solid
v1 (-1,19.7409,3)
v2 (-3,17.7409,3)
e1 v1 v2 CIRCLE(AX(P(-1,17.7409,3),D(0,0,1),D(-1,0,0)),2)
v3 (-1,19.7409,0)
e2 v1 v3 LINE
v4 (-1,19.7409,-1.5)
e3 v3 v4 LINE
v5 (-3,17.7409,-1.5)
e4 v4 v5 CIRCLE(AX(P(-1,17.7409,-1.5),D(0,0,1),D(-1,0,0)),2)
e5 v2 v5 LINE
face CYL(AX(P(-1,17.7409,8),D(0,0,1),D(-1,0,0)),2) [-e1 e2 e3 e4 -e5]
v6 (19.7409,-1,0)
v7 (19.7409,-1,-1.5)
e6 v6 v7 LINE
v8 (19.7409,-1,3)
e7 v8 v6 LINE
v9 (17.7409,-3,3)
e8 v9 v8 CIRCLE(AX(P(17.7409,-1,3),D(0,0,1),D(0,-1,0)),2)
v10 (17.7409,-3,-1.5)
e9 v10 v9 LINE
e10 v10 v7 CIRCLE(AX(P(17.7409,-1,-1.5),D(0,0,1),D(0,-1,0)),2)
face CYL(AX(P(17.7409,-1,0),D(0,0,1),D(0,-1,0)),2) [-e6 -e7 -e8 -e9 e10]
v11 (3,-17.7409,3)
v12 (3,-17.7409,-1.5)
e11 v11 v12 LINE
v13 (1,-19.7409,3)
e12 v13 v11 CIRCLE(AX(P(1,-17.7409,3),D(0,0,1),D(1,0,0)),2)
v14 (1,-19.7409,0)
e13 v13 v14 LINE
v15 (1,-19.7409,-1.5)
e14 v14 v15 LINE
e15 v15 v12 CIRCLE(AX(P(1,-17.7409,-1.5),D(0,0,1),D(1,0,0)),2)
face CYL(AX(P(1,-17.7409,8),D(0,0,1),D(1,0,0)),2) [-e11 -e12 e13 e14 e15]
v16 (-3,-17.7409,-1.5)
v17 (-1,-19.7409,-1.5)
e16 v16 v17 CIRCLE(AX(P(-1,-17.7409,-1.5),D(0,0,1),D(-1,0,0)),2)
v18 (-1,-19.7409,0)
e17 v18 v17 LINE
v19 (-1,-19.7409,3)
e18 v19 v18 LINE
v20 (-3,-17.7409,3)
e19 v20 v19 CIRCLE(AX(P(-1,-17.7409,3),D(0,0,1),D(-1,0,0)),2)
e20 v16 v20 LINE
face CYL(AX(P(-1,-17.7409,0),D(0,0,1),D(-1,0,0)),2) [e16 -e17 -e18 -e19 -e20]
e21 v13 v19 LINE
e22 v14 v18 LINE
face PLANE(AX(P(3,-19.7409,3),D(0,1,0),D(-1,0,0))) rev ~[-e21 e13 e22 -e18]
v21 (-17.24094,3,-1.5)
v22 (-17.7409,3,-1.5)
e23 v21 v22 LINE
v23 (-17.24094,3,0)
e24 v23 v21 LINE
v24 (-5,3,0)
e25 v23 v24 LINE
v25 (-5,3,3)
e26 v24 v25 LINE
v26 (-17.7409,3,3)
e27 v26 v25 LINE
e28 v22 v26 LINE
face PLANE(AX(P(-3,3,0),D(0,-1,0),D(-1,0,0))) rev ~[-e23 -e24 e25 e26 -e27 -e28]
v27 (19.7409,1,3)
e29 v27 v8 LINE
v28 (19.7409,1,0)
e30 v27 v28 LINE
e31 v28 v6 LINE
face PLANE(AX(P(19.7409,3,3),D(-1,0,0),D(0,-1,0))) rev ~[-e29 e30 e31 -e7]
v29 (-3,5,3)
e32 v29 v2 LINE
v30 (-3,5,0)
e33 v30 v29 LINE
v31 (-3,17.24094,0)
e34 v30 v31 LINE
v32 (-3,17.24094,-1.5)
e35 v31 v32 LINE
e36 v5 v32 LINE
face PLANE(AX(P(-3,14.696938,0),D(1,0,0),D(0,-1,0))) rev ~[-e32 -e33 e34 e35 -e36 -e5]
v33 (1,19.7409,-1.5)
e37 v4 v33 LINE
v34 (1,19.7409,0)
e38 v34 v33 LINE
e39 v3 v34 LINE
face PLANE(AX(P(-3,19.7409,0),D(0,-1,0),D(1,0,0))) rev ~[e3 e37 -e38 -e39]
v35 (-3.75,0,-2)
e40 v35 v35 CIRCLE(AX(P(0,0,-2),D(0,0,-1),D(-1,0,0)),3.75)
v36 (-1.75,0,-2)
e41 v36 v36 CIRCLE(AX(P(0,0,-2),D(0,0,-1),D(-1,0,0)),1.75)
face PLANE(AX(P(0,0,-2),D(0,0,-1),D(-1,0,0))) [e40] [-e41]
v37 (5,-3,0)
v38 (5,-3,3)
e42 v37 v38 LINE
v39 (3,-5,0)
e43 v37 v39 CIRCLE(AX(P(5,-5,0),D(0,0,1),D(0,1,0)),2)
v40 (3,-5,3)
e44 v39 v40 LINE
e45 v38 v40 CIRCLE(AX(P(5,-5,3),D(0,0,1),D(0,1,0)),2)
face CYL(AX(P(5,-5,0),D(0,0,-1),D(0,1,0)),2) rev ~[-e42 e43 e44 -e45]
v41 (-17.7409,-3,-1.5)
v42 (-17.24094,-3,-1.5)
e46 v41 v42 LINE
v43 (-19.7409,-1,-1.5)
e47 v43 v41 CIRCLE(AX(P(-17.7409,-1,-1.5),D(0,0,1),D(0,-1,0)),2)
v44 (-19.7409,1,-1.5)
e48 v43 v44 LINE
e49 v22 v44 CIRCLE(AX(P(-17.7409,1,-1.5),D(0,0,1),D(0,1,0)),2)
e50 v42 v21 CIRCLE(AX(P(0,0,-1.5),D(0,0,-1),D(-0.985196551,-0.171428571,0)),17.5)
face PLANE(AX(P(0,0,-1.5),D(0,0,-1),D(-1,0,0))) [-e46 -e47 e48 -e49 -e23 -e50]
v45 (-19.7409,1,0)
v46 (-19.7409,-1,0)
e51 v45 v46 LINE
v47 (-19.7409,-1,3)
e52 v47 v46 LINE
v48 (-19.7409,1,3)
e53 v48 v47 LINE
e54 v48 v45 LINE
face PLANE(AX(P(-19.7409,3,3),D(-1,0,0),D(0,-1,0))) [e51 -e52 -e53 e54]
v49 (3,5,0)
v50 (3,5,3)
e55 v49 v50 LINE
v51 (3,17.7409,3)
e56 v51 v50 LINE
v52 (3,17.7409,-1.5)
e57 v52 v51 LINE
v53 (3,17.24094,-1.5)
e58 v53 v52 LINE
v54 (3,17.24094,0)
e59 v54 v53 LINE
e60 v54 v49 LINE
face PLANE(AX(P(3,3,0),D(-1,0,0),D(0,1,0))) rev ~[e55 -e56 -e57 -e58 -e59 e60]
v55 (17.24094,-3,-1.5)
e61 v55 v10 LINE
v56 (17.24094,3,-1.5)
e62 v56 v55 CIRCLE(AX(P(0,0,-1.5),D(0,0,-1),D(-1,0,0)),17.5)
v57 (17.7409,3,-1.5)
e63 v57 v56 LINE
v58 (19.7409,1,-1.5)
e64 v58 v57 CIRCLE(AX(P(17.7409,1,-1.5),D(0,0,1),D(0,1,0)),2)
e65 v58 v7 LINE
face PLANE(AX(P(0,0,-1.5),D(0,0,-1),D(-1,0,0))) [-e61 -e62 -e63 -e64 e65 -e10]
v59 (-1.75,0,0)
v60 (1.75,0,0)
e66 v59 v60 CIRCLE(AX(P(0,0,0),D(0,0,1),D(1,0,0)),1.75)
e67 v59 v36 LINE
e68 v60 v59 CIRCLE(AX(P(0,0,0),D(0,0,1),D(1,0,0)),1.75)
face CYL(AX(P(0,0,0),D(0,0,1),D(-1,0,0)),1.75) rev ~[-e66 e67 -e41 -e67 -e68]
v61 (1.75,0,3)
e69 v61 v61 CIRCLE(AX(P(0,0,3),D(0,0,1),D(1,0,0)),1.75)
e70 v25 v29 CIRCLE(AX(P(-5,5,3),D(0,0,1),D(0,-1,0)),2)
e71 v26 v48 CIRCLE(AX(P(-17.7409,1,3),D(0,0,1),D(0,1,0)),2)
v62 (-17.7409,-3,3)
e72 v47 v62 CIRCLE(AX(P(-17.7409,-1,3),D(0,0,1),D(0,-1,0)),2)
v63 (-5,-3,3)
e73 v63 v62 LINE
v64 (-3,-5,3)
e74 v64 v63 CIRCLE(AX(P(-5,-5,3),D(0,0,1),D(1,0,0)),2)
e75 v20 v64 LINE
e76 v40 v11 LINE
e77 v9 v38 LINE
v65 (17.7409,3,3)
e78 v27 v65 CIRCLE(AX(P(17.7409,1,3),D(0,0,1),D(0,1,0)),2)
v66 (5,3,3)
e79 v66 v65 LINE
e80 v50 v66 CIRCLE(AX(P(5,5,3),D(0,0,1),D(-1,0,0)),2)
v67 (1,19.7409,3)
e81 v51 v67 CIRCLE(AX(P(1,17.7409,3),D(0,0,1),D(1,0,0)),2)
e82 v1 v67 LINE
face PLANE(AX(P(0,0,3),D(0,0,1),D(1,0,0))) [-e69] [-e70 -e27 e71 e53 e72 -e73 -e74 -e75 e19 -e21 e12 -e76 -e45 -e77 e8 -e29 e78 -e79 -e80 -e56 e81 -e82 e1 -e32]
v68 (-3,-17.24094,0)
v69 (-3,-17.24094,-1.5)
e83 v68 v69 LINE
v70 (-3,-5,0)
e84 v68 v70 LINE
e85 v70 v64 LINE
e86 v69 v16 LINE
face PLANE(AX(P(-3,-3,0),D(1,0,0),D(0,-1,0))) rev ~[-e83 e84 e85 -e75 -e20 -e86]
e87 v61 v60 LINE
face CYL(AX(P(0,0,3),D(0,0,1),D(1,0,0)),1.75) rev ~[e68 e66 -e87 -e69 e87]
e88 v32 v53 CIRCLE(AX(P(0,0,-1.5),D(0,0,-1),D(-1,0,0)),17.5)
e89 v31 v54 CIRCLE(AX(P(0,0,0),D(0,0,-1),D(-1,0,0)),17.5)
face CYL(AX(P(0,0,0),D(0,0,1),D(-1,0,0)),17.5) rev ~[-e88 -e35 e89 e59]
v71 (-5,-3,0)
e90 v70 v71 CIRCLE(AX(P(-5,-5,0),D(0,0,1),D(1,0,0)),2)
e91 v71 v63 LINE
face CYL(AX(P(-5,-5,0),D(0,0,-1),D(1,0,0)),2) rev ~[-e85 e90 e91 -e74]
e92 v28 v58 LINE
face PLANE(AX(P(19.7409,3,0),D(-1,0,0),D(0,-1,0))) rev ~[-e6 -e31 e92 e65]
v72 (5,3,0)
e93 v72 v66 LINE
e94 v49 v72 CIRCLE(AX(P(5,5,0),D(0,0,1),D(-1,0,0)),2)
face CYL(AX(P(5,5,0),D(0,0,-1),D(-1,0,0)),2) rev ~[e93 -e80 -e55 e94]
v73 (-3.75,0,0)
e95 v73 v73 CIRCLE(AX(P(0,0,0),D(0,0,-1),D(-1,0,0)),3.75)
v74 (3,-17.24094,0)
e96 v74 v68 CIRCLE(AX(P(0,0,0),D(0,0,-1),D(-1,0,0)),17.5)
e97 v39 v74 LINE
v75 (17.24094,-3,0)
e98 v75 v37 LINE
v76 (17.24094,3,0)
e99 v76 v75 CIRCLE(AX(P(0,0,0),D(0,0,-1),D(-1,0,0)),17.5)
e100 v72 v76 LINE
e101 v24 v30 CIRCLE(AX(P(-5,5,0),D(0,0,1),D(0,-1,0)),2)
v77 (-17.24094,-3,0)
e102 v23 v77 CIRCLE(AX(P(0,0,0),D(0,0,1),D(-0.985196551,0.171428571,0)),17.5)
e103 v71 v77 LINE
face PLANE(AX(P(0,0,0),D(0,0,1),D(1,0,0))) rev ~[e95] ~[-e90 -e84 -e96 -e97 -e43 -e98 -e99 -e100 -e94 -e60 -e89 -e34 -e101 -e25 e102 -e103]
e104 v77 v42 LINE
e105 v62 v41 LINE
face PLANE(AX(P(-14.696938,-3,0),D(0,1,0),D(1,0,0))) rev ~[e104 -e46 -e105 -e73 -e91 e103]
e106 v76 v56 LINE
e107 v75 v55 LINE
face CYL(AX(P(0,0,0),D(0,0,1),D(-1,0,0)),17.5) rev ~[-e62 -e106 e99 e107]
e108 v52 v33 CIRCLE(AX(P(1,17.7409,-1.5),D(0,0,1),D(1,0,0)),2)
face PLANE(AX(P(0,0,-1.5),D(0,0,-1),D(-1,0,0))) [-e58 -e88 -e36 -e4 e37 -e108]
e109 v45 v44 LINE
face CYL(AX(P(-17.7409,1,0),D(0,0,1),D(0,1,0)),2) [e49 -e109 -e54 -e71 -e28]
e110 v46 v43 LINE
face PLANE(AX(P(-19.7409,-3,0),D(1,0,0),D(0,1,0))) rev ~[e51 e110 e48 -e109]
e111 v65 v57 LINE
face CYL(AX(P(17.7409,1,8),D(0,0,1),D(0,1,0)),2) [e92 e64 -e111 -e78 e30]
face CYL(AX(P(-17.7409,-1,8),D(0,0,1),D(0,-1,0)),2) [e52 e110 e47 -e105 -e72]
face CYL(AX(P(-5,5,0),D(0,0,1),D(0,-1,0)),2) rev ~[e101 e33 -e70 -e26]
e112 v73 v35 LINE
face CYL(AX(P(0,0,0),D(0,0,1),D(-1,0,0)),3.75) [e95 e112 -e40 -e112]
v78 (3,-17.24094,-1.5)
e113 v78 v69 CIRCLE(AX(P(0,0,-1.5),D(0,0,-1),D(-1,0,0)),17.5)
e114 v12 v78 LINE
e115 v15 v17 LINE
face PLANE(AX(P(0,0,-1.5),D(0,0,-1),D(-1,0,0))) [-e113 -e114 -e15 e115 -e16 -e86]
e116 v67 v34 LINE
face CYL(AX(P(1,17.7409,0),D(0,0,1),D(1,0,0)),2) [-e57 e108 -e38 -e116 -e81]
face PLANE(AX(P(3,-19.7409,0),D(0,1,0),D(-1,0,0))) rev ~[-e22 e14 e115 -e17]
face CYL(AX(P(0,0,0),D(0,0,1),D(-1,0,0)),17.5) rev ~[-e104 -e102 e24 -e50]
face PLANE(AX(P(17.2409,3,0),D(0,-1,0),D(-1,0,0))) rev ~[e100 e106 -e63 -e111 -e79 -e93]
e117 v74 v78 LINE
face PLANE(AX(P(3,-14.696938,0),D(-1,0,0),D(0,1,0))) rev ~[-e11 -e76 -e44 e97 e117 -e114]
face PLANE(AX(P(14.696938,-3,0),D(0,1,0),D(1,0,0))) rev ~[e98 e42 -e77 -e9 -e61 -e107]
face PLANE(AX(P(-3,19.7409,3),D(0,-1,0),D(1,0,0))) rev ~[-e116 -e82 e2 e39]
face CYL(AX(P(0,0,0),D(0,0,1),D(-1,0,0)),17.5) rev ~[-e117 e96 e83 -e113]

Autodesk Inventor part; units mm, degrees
ref_plane "YZ Plane" through (0, 0, 0) normal (1, 0, 0) x (0, 1, 0)
ref_plane "XZ Plane" through (0, 0, 0) normal (0, 1, 0) x (-1, 0, 0)
sketch "Szkic1" plane through (0, 0, 0) normal (0, 0, 1) x (1, 0, 0)
  circle A0 centre (0, 0) radius 17.5
  circle A1 centre (0, 0) radius 15
  line L0 (-3, -17.2409) -> (3, -17.2409)
  line L1 (3, -17.2409) -> (3, 17.2409)
  line L2 (3, 17.2409) -> (-3, 17.2409)
  line L3 (-3, 17.2409) -> (-3, -17.2409)
  line L4 (-3, -17.2409) -> (3, 17.2409) construction
  line L5 (3, -17.2409) -> (-3, 17.2409) construction
  line L6 (17.2409, 3) -> (-17.2409, 3)
  line L7 (-17.2409, 3) -> (-17.2409, -3)
  line L8 (-17.2409, -3) -> (17.2409, -3)
  line L9 (17.2409, -3) -> (17.2409, 3)
  line L10 (17.2409, 3) -> (-17.2409, -3) construction
  line L11 (-17.2409, 3) -> (17.2409, -3) construction
  circle A2 centre (0, 0) radius 1.75
  point P0 (-3, 3)
  point P1 (-3, -3)
  point P2 (3, -3)
  point P3 (3, 3)
  dimension "d0" = 6
  dimension "d1" = 6
  dimension "d2" = 3.5
extrude "Wyciągnięcie proste1" add sketch "Szkic1" along normal blind 3 contours L9 L8 A1 L6 | L1 A1 L3 L2 | A1 L8 L1 L6 | L0 L3 A1 L1 | L1 L6 L3 A1 | L1 L8 L3 L6 | A1 L3 L8 L1 | L6 A1 L8 L7 | L3 L8 A1 L6 | A2
sketch "Szkic2" plane through (0, 0, 3) normal (0, 0, 1) x (1, 0, 0)
  circle A0 centre (0, 0) radius 1.75
  dimension "d5" = 3.5
extrude "Wyciągnięcie proste2" cut sketch "Szkic2" against normal through all
sketch "Szkic3" plane through (0, 0, 0) normal (0, 0, -1) x (-1, 0, 0)
  circle A0 centre (0, 0) radius 1.75
  circle A1 centre (0, 0) radius 3.75
  dimension "d8" = 2
ref_plane "Płaszczyzna konstrukcyjna1" through (-11.5, -11.5, -2) normal (0, 0, -1) x (0, 1, 0)
extrude "Wyciągnięcie proste3" add sketch "Szkic3" along normal up to surface (2 mm away)
sketch "Szkic4" plane through (0, 0, 3) normal (0, 0, 1) x (1, 0, 0)
  circle A0 centre (0, 0) radius 17.5
  circle A1 centre (0, 0) radius 1.75
  line L0 (-17.2409, 3) -> (-17.2409, -3)
  line L1 (-17.2409, -3) -> (-3, -3)
  line L2 (-3, -3) -> (-3, -17.2409)
  line L3 (-3, -17.2409) -> (3, -17.2409)
  line L4 (3, -17.2409) -> (3, -3)
  line L5 (3, -3) -> (17.2409, -3)
  line L6 (17.2409, -3) -> (17.2409, 3)
  line L7 (17.2409, 3) -> (3, 3)
  line L8 (3, 3) -> (3, 17.2409)
  line L9 (3, 17.2409) -> (-3, 17.2409)
  line L10 (-3, 17.2409) -> (-3, 3)
  line L11 (-3, 3) -> (-17.2409, 3)
  line L12 (17.2409, 3) -> (3, 3)
  line L13 (17.2409, 3) -> (19.7409, 3)
  line L14 (19.7409, 3) -> (19.7409, -3)
  line L15 (19.7409, -3) -> (17.2409, -3)
  line L16 (17.2409, -3) -> (17.2409, 3)
  line L17 (-3, 3) -> (-17.2409, 3)
  line L18 (-17.2409, 3) -> (-19.7409, 3)
  line L19 (-19.7409, 3) -> (-19.7409, -3)
  line L20 (-19.7409, -3) -> (-17.2409, -3)
  line L21 (-17.2409, -3) -> (-17.2409, 3)
  line L22 (-3, -17.2409) -> (3, -17.2409)
  line L23 (3, -17.2409) -> (3, -19.7409)
  line L24 (3, -19.7409) -> (-3, -19.7409)
  line L25 (-3, -19.7409) -> (-3, -17.2409)
  line L26 (3, 17.2409) -> (-3, 17.2409)
  line L27 (-3, 17.2409) -> (-3, 19.7409)
  line L28 (-3, 19.7409) -> (3, 19.7409)
  line L29 (3, 19.7409) -> (3, 17.2409)
  dimension "d11" = 2.5
  dimension "d12" = 2.5
  dimension "d13" = 2.5
  dimension "d14" = 2.5
extrude "Wyciągnięcie proste4" add sketch "Szkic4" against normal blind 3 contours A0 L6 | A0 L13 L14 L15 | L9 A0 | A0 L27 L28 L29 | L23 L24 L25 A0 | A0 L3 | L0 A0 | A0 L20 L19 L18
sketch "Szkic5" plane through (0, 0, 0) normal (0, 0, -1) x (-1, 0, 0)
  circle A0 centre (0, 0) radius 17.5
  circle A1 centre (0, 0) radius 3.75
  line L0 (3, 3) -> (19.7409, 3)
  line L1 (3, 3) -> (3, 19.7409)
  line L2 (3, 19.7409) -> (-3, 19.7409)
  line L3 (-3, 3) -> (-3, 19.7409)
  line L4 (-3, 3) -> (-19.7409, 3)
  line L5 (-19.7409, 3) -> (-19.7409, -3)
  line L6 (-3, -3) -> (-19.7409, -3)
  line L7 (-3, -3) -> (-3, -19.7409)
  line L8 (-3, -19.7409) -> (3, -19.7409)
  line L9 (3, -3) -> (3, -19.7409)
  line L10 (3, -3) -> (19.7409, -3)
  line L11 (19.7409, -3) -> (19.7409, 3)
  circle A2 centre (0, 0) radius 17.7
  point P0 (3, -17.4439)
  point P1 (-3, -17.4439)
  point P2 (17.4439, 3)
  point P3 (17.4439, -3)
  point P4 (-17.4439, -3)
  point P5 (-17.4439, 3)
  point P6 (-3, 17.4439)
  point P7 (3, 17.4439)
  dimension "d17" = 0.2
extrude "Wyciągnięcie proste5" add sketch "Szkic5" along normal blind 1.5 contours L0 L11 L10 A2 | A2 L3 L2 L1 | L9 L8 L7 A2 | A2 L6 L5 L4
fillet "Zaokrąglenie1" radius 2 19 edges at (-3, -3, 1.5) (-3, -19.7409, 1.5) (-3, -19.7409, -0.75) (-19.7409, -3, -0.75) (-19.7409, -3, 1.5) (3, -19.7409, -0.75) (3, -19.7409, 1.5) (3, -3, 1.5) (19.7409, -3, 1.5) (19.7409, -3, -0.75) (19.7409, 3, -0.75) (19.7409, 3, 1.5) (3, 3, 1.5) (3, 19.7409, 1.5) (3, 19.7409, -0.75) (-3, 19.7409, -0.75) (-3, 19.7409, 1.5) (-19.7409, 3, 1.5) (-19.7409, 3, -0.75)
fillet "Zaokrąglenie2" radius 2 1 edges at (-3, 3, 1.5)
sketch "Szkic6" plane through (0, 0, 0) normal (0, 0, -1) x (-1, 0, 0)
  circle A0 centre (0, 0) radius 17.5
  arc A1 (17.4439, -3) -> (17.4439, 3) centre (0, 0) ccw
  line L0 (5, 3) -> (17.4439, 3)
  arc A2 (3, 5) -> (5, 3) centre (5, 5) ccw
  line L1 (3, 5) -> (3, 17.4439)
  arc A3 (3, 17.4439) -> (-3, 17.4439) centre (0, 0) ccw
  line L2 (-3, 5) -> (-3, 17.4439)
  arc A4 (-5, 3) -> (-3, 5) centre (-5, 5) ccw
  line L3 (-5, 3) -> (-17.4439, 3)
  arc A5 (-17.4439, 3) -> (-17.4439, -3) centre (0, 0) ccw
  line L4 (-5, -3) -> (-17.4439, -3)
  arc A6 (-3, -5) -> (-5, -3) centre (-5, -5) ccw
  line L5 (-3, -5) -> (-3, -17.4439)
  arc A7 (-3, -17.4439) -> (3, -17.4439) centre (0, 0) ccw
  line L6 (3, -5) -> (3, -17.4439)
  arc A8 (5, -3) -> (3, -5) centre (5, -5) ccw
  line L7 (5, -3) -> (17.4439, -3)
  circle A9 centre (0, 0) radius 3.75
  point P0 (3, -17.2409)
  point P1 (-3, -17.2409)
  point P2 (-17.2409, -3)
  point P3 (-17.2409, 3)
  point P4 (-3, 17.2409)
  point P5 (3, 17.2409)
  point P6 (17.2409, 3)
  point P7 (17.2409, -3)
  dimension "d22" = 35
extrude "Wyciągnięcie proste6" add sketch "Szkic6" along normal up to surface (1.5 mm away) contours A0 L0 A1 L7 | A0 L2 A3 L1 | L6 A7 L5 A0 | A0 L4 A5 L3
properties part number "gora"
